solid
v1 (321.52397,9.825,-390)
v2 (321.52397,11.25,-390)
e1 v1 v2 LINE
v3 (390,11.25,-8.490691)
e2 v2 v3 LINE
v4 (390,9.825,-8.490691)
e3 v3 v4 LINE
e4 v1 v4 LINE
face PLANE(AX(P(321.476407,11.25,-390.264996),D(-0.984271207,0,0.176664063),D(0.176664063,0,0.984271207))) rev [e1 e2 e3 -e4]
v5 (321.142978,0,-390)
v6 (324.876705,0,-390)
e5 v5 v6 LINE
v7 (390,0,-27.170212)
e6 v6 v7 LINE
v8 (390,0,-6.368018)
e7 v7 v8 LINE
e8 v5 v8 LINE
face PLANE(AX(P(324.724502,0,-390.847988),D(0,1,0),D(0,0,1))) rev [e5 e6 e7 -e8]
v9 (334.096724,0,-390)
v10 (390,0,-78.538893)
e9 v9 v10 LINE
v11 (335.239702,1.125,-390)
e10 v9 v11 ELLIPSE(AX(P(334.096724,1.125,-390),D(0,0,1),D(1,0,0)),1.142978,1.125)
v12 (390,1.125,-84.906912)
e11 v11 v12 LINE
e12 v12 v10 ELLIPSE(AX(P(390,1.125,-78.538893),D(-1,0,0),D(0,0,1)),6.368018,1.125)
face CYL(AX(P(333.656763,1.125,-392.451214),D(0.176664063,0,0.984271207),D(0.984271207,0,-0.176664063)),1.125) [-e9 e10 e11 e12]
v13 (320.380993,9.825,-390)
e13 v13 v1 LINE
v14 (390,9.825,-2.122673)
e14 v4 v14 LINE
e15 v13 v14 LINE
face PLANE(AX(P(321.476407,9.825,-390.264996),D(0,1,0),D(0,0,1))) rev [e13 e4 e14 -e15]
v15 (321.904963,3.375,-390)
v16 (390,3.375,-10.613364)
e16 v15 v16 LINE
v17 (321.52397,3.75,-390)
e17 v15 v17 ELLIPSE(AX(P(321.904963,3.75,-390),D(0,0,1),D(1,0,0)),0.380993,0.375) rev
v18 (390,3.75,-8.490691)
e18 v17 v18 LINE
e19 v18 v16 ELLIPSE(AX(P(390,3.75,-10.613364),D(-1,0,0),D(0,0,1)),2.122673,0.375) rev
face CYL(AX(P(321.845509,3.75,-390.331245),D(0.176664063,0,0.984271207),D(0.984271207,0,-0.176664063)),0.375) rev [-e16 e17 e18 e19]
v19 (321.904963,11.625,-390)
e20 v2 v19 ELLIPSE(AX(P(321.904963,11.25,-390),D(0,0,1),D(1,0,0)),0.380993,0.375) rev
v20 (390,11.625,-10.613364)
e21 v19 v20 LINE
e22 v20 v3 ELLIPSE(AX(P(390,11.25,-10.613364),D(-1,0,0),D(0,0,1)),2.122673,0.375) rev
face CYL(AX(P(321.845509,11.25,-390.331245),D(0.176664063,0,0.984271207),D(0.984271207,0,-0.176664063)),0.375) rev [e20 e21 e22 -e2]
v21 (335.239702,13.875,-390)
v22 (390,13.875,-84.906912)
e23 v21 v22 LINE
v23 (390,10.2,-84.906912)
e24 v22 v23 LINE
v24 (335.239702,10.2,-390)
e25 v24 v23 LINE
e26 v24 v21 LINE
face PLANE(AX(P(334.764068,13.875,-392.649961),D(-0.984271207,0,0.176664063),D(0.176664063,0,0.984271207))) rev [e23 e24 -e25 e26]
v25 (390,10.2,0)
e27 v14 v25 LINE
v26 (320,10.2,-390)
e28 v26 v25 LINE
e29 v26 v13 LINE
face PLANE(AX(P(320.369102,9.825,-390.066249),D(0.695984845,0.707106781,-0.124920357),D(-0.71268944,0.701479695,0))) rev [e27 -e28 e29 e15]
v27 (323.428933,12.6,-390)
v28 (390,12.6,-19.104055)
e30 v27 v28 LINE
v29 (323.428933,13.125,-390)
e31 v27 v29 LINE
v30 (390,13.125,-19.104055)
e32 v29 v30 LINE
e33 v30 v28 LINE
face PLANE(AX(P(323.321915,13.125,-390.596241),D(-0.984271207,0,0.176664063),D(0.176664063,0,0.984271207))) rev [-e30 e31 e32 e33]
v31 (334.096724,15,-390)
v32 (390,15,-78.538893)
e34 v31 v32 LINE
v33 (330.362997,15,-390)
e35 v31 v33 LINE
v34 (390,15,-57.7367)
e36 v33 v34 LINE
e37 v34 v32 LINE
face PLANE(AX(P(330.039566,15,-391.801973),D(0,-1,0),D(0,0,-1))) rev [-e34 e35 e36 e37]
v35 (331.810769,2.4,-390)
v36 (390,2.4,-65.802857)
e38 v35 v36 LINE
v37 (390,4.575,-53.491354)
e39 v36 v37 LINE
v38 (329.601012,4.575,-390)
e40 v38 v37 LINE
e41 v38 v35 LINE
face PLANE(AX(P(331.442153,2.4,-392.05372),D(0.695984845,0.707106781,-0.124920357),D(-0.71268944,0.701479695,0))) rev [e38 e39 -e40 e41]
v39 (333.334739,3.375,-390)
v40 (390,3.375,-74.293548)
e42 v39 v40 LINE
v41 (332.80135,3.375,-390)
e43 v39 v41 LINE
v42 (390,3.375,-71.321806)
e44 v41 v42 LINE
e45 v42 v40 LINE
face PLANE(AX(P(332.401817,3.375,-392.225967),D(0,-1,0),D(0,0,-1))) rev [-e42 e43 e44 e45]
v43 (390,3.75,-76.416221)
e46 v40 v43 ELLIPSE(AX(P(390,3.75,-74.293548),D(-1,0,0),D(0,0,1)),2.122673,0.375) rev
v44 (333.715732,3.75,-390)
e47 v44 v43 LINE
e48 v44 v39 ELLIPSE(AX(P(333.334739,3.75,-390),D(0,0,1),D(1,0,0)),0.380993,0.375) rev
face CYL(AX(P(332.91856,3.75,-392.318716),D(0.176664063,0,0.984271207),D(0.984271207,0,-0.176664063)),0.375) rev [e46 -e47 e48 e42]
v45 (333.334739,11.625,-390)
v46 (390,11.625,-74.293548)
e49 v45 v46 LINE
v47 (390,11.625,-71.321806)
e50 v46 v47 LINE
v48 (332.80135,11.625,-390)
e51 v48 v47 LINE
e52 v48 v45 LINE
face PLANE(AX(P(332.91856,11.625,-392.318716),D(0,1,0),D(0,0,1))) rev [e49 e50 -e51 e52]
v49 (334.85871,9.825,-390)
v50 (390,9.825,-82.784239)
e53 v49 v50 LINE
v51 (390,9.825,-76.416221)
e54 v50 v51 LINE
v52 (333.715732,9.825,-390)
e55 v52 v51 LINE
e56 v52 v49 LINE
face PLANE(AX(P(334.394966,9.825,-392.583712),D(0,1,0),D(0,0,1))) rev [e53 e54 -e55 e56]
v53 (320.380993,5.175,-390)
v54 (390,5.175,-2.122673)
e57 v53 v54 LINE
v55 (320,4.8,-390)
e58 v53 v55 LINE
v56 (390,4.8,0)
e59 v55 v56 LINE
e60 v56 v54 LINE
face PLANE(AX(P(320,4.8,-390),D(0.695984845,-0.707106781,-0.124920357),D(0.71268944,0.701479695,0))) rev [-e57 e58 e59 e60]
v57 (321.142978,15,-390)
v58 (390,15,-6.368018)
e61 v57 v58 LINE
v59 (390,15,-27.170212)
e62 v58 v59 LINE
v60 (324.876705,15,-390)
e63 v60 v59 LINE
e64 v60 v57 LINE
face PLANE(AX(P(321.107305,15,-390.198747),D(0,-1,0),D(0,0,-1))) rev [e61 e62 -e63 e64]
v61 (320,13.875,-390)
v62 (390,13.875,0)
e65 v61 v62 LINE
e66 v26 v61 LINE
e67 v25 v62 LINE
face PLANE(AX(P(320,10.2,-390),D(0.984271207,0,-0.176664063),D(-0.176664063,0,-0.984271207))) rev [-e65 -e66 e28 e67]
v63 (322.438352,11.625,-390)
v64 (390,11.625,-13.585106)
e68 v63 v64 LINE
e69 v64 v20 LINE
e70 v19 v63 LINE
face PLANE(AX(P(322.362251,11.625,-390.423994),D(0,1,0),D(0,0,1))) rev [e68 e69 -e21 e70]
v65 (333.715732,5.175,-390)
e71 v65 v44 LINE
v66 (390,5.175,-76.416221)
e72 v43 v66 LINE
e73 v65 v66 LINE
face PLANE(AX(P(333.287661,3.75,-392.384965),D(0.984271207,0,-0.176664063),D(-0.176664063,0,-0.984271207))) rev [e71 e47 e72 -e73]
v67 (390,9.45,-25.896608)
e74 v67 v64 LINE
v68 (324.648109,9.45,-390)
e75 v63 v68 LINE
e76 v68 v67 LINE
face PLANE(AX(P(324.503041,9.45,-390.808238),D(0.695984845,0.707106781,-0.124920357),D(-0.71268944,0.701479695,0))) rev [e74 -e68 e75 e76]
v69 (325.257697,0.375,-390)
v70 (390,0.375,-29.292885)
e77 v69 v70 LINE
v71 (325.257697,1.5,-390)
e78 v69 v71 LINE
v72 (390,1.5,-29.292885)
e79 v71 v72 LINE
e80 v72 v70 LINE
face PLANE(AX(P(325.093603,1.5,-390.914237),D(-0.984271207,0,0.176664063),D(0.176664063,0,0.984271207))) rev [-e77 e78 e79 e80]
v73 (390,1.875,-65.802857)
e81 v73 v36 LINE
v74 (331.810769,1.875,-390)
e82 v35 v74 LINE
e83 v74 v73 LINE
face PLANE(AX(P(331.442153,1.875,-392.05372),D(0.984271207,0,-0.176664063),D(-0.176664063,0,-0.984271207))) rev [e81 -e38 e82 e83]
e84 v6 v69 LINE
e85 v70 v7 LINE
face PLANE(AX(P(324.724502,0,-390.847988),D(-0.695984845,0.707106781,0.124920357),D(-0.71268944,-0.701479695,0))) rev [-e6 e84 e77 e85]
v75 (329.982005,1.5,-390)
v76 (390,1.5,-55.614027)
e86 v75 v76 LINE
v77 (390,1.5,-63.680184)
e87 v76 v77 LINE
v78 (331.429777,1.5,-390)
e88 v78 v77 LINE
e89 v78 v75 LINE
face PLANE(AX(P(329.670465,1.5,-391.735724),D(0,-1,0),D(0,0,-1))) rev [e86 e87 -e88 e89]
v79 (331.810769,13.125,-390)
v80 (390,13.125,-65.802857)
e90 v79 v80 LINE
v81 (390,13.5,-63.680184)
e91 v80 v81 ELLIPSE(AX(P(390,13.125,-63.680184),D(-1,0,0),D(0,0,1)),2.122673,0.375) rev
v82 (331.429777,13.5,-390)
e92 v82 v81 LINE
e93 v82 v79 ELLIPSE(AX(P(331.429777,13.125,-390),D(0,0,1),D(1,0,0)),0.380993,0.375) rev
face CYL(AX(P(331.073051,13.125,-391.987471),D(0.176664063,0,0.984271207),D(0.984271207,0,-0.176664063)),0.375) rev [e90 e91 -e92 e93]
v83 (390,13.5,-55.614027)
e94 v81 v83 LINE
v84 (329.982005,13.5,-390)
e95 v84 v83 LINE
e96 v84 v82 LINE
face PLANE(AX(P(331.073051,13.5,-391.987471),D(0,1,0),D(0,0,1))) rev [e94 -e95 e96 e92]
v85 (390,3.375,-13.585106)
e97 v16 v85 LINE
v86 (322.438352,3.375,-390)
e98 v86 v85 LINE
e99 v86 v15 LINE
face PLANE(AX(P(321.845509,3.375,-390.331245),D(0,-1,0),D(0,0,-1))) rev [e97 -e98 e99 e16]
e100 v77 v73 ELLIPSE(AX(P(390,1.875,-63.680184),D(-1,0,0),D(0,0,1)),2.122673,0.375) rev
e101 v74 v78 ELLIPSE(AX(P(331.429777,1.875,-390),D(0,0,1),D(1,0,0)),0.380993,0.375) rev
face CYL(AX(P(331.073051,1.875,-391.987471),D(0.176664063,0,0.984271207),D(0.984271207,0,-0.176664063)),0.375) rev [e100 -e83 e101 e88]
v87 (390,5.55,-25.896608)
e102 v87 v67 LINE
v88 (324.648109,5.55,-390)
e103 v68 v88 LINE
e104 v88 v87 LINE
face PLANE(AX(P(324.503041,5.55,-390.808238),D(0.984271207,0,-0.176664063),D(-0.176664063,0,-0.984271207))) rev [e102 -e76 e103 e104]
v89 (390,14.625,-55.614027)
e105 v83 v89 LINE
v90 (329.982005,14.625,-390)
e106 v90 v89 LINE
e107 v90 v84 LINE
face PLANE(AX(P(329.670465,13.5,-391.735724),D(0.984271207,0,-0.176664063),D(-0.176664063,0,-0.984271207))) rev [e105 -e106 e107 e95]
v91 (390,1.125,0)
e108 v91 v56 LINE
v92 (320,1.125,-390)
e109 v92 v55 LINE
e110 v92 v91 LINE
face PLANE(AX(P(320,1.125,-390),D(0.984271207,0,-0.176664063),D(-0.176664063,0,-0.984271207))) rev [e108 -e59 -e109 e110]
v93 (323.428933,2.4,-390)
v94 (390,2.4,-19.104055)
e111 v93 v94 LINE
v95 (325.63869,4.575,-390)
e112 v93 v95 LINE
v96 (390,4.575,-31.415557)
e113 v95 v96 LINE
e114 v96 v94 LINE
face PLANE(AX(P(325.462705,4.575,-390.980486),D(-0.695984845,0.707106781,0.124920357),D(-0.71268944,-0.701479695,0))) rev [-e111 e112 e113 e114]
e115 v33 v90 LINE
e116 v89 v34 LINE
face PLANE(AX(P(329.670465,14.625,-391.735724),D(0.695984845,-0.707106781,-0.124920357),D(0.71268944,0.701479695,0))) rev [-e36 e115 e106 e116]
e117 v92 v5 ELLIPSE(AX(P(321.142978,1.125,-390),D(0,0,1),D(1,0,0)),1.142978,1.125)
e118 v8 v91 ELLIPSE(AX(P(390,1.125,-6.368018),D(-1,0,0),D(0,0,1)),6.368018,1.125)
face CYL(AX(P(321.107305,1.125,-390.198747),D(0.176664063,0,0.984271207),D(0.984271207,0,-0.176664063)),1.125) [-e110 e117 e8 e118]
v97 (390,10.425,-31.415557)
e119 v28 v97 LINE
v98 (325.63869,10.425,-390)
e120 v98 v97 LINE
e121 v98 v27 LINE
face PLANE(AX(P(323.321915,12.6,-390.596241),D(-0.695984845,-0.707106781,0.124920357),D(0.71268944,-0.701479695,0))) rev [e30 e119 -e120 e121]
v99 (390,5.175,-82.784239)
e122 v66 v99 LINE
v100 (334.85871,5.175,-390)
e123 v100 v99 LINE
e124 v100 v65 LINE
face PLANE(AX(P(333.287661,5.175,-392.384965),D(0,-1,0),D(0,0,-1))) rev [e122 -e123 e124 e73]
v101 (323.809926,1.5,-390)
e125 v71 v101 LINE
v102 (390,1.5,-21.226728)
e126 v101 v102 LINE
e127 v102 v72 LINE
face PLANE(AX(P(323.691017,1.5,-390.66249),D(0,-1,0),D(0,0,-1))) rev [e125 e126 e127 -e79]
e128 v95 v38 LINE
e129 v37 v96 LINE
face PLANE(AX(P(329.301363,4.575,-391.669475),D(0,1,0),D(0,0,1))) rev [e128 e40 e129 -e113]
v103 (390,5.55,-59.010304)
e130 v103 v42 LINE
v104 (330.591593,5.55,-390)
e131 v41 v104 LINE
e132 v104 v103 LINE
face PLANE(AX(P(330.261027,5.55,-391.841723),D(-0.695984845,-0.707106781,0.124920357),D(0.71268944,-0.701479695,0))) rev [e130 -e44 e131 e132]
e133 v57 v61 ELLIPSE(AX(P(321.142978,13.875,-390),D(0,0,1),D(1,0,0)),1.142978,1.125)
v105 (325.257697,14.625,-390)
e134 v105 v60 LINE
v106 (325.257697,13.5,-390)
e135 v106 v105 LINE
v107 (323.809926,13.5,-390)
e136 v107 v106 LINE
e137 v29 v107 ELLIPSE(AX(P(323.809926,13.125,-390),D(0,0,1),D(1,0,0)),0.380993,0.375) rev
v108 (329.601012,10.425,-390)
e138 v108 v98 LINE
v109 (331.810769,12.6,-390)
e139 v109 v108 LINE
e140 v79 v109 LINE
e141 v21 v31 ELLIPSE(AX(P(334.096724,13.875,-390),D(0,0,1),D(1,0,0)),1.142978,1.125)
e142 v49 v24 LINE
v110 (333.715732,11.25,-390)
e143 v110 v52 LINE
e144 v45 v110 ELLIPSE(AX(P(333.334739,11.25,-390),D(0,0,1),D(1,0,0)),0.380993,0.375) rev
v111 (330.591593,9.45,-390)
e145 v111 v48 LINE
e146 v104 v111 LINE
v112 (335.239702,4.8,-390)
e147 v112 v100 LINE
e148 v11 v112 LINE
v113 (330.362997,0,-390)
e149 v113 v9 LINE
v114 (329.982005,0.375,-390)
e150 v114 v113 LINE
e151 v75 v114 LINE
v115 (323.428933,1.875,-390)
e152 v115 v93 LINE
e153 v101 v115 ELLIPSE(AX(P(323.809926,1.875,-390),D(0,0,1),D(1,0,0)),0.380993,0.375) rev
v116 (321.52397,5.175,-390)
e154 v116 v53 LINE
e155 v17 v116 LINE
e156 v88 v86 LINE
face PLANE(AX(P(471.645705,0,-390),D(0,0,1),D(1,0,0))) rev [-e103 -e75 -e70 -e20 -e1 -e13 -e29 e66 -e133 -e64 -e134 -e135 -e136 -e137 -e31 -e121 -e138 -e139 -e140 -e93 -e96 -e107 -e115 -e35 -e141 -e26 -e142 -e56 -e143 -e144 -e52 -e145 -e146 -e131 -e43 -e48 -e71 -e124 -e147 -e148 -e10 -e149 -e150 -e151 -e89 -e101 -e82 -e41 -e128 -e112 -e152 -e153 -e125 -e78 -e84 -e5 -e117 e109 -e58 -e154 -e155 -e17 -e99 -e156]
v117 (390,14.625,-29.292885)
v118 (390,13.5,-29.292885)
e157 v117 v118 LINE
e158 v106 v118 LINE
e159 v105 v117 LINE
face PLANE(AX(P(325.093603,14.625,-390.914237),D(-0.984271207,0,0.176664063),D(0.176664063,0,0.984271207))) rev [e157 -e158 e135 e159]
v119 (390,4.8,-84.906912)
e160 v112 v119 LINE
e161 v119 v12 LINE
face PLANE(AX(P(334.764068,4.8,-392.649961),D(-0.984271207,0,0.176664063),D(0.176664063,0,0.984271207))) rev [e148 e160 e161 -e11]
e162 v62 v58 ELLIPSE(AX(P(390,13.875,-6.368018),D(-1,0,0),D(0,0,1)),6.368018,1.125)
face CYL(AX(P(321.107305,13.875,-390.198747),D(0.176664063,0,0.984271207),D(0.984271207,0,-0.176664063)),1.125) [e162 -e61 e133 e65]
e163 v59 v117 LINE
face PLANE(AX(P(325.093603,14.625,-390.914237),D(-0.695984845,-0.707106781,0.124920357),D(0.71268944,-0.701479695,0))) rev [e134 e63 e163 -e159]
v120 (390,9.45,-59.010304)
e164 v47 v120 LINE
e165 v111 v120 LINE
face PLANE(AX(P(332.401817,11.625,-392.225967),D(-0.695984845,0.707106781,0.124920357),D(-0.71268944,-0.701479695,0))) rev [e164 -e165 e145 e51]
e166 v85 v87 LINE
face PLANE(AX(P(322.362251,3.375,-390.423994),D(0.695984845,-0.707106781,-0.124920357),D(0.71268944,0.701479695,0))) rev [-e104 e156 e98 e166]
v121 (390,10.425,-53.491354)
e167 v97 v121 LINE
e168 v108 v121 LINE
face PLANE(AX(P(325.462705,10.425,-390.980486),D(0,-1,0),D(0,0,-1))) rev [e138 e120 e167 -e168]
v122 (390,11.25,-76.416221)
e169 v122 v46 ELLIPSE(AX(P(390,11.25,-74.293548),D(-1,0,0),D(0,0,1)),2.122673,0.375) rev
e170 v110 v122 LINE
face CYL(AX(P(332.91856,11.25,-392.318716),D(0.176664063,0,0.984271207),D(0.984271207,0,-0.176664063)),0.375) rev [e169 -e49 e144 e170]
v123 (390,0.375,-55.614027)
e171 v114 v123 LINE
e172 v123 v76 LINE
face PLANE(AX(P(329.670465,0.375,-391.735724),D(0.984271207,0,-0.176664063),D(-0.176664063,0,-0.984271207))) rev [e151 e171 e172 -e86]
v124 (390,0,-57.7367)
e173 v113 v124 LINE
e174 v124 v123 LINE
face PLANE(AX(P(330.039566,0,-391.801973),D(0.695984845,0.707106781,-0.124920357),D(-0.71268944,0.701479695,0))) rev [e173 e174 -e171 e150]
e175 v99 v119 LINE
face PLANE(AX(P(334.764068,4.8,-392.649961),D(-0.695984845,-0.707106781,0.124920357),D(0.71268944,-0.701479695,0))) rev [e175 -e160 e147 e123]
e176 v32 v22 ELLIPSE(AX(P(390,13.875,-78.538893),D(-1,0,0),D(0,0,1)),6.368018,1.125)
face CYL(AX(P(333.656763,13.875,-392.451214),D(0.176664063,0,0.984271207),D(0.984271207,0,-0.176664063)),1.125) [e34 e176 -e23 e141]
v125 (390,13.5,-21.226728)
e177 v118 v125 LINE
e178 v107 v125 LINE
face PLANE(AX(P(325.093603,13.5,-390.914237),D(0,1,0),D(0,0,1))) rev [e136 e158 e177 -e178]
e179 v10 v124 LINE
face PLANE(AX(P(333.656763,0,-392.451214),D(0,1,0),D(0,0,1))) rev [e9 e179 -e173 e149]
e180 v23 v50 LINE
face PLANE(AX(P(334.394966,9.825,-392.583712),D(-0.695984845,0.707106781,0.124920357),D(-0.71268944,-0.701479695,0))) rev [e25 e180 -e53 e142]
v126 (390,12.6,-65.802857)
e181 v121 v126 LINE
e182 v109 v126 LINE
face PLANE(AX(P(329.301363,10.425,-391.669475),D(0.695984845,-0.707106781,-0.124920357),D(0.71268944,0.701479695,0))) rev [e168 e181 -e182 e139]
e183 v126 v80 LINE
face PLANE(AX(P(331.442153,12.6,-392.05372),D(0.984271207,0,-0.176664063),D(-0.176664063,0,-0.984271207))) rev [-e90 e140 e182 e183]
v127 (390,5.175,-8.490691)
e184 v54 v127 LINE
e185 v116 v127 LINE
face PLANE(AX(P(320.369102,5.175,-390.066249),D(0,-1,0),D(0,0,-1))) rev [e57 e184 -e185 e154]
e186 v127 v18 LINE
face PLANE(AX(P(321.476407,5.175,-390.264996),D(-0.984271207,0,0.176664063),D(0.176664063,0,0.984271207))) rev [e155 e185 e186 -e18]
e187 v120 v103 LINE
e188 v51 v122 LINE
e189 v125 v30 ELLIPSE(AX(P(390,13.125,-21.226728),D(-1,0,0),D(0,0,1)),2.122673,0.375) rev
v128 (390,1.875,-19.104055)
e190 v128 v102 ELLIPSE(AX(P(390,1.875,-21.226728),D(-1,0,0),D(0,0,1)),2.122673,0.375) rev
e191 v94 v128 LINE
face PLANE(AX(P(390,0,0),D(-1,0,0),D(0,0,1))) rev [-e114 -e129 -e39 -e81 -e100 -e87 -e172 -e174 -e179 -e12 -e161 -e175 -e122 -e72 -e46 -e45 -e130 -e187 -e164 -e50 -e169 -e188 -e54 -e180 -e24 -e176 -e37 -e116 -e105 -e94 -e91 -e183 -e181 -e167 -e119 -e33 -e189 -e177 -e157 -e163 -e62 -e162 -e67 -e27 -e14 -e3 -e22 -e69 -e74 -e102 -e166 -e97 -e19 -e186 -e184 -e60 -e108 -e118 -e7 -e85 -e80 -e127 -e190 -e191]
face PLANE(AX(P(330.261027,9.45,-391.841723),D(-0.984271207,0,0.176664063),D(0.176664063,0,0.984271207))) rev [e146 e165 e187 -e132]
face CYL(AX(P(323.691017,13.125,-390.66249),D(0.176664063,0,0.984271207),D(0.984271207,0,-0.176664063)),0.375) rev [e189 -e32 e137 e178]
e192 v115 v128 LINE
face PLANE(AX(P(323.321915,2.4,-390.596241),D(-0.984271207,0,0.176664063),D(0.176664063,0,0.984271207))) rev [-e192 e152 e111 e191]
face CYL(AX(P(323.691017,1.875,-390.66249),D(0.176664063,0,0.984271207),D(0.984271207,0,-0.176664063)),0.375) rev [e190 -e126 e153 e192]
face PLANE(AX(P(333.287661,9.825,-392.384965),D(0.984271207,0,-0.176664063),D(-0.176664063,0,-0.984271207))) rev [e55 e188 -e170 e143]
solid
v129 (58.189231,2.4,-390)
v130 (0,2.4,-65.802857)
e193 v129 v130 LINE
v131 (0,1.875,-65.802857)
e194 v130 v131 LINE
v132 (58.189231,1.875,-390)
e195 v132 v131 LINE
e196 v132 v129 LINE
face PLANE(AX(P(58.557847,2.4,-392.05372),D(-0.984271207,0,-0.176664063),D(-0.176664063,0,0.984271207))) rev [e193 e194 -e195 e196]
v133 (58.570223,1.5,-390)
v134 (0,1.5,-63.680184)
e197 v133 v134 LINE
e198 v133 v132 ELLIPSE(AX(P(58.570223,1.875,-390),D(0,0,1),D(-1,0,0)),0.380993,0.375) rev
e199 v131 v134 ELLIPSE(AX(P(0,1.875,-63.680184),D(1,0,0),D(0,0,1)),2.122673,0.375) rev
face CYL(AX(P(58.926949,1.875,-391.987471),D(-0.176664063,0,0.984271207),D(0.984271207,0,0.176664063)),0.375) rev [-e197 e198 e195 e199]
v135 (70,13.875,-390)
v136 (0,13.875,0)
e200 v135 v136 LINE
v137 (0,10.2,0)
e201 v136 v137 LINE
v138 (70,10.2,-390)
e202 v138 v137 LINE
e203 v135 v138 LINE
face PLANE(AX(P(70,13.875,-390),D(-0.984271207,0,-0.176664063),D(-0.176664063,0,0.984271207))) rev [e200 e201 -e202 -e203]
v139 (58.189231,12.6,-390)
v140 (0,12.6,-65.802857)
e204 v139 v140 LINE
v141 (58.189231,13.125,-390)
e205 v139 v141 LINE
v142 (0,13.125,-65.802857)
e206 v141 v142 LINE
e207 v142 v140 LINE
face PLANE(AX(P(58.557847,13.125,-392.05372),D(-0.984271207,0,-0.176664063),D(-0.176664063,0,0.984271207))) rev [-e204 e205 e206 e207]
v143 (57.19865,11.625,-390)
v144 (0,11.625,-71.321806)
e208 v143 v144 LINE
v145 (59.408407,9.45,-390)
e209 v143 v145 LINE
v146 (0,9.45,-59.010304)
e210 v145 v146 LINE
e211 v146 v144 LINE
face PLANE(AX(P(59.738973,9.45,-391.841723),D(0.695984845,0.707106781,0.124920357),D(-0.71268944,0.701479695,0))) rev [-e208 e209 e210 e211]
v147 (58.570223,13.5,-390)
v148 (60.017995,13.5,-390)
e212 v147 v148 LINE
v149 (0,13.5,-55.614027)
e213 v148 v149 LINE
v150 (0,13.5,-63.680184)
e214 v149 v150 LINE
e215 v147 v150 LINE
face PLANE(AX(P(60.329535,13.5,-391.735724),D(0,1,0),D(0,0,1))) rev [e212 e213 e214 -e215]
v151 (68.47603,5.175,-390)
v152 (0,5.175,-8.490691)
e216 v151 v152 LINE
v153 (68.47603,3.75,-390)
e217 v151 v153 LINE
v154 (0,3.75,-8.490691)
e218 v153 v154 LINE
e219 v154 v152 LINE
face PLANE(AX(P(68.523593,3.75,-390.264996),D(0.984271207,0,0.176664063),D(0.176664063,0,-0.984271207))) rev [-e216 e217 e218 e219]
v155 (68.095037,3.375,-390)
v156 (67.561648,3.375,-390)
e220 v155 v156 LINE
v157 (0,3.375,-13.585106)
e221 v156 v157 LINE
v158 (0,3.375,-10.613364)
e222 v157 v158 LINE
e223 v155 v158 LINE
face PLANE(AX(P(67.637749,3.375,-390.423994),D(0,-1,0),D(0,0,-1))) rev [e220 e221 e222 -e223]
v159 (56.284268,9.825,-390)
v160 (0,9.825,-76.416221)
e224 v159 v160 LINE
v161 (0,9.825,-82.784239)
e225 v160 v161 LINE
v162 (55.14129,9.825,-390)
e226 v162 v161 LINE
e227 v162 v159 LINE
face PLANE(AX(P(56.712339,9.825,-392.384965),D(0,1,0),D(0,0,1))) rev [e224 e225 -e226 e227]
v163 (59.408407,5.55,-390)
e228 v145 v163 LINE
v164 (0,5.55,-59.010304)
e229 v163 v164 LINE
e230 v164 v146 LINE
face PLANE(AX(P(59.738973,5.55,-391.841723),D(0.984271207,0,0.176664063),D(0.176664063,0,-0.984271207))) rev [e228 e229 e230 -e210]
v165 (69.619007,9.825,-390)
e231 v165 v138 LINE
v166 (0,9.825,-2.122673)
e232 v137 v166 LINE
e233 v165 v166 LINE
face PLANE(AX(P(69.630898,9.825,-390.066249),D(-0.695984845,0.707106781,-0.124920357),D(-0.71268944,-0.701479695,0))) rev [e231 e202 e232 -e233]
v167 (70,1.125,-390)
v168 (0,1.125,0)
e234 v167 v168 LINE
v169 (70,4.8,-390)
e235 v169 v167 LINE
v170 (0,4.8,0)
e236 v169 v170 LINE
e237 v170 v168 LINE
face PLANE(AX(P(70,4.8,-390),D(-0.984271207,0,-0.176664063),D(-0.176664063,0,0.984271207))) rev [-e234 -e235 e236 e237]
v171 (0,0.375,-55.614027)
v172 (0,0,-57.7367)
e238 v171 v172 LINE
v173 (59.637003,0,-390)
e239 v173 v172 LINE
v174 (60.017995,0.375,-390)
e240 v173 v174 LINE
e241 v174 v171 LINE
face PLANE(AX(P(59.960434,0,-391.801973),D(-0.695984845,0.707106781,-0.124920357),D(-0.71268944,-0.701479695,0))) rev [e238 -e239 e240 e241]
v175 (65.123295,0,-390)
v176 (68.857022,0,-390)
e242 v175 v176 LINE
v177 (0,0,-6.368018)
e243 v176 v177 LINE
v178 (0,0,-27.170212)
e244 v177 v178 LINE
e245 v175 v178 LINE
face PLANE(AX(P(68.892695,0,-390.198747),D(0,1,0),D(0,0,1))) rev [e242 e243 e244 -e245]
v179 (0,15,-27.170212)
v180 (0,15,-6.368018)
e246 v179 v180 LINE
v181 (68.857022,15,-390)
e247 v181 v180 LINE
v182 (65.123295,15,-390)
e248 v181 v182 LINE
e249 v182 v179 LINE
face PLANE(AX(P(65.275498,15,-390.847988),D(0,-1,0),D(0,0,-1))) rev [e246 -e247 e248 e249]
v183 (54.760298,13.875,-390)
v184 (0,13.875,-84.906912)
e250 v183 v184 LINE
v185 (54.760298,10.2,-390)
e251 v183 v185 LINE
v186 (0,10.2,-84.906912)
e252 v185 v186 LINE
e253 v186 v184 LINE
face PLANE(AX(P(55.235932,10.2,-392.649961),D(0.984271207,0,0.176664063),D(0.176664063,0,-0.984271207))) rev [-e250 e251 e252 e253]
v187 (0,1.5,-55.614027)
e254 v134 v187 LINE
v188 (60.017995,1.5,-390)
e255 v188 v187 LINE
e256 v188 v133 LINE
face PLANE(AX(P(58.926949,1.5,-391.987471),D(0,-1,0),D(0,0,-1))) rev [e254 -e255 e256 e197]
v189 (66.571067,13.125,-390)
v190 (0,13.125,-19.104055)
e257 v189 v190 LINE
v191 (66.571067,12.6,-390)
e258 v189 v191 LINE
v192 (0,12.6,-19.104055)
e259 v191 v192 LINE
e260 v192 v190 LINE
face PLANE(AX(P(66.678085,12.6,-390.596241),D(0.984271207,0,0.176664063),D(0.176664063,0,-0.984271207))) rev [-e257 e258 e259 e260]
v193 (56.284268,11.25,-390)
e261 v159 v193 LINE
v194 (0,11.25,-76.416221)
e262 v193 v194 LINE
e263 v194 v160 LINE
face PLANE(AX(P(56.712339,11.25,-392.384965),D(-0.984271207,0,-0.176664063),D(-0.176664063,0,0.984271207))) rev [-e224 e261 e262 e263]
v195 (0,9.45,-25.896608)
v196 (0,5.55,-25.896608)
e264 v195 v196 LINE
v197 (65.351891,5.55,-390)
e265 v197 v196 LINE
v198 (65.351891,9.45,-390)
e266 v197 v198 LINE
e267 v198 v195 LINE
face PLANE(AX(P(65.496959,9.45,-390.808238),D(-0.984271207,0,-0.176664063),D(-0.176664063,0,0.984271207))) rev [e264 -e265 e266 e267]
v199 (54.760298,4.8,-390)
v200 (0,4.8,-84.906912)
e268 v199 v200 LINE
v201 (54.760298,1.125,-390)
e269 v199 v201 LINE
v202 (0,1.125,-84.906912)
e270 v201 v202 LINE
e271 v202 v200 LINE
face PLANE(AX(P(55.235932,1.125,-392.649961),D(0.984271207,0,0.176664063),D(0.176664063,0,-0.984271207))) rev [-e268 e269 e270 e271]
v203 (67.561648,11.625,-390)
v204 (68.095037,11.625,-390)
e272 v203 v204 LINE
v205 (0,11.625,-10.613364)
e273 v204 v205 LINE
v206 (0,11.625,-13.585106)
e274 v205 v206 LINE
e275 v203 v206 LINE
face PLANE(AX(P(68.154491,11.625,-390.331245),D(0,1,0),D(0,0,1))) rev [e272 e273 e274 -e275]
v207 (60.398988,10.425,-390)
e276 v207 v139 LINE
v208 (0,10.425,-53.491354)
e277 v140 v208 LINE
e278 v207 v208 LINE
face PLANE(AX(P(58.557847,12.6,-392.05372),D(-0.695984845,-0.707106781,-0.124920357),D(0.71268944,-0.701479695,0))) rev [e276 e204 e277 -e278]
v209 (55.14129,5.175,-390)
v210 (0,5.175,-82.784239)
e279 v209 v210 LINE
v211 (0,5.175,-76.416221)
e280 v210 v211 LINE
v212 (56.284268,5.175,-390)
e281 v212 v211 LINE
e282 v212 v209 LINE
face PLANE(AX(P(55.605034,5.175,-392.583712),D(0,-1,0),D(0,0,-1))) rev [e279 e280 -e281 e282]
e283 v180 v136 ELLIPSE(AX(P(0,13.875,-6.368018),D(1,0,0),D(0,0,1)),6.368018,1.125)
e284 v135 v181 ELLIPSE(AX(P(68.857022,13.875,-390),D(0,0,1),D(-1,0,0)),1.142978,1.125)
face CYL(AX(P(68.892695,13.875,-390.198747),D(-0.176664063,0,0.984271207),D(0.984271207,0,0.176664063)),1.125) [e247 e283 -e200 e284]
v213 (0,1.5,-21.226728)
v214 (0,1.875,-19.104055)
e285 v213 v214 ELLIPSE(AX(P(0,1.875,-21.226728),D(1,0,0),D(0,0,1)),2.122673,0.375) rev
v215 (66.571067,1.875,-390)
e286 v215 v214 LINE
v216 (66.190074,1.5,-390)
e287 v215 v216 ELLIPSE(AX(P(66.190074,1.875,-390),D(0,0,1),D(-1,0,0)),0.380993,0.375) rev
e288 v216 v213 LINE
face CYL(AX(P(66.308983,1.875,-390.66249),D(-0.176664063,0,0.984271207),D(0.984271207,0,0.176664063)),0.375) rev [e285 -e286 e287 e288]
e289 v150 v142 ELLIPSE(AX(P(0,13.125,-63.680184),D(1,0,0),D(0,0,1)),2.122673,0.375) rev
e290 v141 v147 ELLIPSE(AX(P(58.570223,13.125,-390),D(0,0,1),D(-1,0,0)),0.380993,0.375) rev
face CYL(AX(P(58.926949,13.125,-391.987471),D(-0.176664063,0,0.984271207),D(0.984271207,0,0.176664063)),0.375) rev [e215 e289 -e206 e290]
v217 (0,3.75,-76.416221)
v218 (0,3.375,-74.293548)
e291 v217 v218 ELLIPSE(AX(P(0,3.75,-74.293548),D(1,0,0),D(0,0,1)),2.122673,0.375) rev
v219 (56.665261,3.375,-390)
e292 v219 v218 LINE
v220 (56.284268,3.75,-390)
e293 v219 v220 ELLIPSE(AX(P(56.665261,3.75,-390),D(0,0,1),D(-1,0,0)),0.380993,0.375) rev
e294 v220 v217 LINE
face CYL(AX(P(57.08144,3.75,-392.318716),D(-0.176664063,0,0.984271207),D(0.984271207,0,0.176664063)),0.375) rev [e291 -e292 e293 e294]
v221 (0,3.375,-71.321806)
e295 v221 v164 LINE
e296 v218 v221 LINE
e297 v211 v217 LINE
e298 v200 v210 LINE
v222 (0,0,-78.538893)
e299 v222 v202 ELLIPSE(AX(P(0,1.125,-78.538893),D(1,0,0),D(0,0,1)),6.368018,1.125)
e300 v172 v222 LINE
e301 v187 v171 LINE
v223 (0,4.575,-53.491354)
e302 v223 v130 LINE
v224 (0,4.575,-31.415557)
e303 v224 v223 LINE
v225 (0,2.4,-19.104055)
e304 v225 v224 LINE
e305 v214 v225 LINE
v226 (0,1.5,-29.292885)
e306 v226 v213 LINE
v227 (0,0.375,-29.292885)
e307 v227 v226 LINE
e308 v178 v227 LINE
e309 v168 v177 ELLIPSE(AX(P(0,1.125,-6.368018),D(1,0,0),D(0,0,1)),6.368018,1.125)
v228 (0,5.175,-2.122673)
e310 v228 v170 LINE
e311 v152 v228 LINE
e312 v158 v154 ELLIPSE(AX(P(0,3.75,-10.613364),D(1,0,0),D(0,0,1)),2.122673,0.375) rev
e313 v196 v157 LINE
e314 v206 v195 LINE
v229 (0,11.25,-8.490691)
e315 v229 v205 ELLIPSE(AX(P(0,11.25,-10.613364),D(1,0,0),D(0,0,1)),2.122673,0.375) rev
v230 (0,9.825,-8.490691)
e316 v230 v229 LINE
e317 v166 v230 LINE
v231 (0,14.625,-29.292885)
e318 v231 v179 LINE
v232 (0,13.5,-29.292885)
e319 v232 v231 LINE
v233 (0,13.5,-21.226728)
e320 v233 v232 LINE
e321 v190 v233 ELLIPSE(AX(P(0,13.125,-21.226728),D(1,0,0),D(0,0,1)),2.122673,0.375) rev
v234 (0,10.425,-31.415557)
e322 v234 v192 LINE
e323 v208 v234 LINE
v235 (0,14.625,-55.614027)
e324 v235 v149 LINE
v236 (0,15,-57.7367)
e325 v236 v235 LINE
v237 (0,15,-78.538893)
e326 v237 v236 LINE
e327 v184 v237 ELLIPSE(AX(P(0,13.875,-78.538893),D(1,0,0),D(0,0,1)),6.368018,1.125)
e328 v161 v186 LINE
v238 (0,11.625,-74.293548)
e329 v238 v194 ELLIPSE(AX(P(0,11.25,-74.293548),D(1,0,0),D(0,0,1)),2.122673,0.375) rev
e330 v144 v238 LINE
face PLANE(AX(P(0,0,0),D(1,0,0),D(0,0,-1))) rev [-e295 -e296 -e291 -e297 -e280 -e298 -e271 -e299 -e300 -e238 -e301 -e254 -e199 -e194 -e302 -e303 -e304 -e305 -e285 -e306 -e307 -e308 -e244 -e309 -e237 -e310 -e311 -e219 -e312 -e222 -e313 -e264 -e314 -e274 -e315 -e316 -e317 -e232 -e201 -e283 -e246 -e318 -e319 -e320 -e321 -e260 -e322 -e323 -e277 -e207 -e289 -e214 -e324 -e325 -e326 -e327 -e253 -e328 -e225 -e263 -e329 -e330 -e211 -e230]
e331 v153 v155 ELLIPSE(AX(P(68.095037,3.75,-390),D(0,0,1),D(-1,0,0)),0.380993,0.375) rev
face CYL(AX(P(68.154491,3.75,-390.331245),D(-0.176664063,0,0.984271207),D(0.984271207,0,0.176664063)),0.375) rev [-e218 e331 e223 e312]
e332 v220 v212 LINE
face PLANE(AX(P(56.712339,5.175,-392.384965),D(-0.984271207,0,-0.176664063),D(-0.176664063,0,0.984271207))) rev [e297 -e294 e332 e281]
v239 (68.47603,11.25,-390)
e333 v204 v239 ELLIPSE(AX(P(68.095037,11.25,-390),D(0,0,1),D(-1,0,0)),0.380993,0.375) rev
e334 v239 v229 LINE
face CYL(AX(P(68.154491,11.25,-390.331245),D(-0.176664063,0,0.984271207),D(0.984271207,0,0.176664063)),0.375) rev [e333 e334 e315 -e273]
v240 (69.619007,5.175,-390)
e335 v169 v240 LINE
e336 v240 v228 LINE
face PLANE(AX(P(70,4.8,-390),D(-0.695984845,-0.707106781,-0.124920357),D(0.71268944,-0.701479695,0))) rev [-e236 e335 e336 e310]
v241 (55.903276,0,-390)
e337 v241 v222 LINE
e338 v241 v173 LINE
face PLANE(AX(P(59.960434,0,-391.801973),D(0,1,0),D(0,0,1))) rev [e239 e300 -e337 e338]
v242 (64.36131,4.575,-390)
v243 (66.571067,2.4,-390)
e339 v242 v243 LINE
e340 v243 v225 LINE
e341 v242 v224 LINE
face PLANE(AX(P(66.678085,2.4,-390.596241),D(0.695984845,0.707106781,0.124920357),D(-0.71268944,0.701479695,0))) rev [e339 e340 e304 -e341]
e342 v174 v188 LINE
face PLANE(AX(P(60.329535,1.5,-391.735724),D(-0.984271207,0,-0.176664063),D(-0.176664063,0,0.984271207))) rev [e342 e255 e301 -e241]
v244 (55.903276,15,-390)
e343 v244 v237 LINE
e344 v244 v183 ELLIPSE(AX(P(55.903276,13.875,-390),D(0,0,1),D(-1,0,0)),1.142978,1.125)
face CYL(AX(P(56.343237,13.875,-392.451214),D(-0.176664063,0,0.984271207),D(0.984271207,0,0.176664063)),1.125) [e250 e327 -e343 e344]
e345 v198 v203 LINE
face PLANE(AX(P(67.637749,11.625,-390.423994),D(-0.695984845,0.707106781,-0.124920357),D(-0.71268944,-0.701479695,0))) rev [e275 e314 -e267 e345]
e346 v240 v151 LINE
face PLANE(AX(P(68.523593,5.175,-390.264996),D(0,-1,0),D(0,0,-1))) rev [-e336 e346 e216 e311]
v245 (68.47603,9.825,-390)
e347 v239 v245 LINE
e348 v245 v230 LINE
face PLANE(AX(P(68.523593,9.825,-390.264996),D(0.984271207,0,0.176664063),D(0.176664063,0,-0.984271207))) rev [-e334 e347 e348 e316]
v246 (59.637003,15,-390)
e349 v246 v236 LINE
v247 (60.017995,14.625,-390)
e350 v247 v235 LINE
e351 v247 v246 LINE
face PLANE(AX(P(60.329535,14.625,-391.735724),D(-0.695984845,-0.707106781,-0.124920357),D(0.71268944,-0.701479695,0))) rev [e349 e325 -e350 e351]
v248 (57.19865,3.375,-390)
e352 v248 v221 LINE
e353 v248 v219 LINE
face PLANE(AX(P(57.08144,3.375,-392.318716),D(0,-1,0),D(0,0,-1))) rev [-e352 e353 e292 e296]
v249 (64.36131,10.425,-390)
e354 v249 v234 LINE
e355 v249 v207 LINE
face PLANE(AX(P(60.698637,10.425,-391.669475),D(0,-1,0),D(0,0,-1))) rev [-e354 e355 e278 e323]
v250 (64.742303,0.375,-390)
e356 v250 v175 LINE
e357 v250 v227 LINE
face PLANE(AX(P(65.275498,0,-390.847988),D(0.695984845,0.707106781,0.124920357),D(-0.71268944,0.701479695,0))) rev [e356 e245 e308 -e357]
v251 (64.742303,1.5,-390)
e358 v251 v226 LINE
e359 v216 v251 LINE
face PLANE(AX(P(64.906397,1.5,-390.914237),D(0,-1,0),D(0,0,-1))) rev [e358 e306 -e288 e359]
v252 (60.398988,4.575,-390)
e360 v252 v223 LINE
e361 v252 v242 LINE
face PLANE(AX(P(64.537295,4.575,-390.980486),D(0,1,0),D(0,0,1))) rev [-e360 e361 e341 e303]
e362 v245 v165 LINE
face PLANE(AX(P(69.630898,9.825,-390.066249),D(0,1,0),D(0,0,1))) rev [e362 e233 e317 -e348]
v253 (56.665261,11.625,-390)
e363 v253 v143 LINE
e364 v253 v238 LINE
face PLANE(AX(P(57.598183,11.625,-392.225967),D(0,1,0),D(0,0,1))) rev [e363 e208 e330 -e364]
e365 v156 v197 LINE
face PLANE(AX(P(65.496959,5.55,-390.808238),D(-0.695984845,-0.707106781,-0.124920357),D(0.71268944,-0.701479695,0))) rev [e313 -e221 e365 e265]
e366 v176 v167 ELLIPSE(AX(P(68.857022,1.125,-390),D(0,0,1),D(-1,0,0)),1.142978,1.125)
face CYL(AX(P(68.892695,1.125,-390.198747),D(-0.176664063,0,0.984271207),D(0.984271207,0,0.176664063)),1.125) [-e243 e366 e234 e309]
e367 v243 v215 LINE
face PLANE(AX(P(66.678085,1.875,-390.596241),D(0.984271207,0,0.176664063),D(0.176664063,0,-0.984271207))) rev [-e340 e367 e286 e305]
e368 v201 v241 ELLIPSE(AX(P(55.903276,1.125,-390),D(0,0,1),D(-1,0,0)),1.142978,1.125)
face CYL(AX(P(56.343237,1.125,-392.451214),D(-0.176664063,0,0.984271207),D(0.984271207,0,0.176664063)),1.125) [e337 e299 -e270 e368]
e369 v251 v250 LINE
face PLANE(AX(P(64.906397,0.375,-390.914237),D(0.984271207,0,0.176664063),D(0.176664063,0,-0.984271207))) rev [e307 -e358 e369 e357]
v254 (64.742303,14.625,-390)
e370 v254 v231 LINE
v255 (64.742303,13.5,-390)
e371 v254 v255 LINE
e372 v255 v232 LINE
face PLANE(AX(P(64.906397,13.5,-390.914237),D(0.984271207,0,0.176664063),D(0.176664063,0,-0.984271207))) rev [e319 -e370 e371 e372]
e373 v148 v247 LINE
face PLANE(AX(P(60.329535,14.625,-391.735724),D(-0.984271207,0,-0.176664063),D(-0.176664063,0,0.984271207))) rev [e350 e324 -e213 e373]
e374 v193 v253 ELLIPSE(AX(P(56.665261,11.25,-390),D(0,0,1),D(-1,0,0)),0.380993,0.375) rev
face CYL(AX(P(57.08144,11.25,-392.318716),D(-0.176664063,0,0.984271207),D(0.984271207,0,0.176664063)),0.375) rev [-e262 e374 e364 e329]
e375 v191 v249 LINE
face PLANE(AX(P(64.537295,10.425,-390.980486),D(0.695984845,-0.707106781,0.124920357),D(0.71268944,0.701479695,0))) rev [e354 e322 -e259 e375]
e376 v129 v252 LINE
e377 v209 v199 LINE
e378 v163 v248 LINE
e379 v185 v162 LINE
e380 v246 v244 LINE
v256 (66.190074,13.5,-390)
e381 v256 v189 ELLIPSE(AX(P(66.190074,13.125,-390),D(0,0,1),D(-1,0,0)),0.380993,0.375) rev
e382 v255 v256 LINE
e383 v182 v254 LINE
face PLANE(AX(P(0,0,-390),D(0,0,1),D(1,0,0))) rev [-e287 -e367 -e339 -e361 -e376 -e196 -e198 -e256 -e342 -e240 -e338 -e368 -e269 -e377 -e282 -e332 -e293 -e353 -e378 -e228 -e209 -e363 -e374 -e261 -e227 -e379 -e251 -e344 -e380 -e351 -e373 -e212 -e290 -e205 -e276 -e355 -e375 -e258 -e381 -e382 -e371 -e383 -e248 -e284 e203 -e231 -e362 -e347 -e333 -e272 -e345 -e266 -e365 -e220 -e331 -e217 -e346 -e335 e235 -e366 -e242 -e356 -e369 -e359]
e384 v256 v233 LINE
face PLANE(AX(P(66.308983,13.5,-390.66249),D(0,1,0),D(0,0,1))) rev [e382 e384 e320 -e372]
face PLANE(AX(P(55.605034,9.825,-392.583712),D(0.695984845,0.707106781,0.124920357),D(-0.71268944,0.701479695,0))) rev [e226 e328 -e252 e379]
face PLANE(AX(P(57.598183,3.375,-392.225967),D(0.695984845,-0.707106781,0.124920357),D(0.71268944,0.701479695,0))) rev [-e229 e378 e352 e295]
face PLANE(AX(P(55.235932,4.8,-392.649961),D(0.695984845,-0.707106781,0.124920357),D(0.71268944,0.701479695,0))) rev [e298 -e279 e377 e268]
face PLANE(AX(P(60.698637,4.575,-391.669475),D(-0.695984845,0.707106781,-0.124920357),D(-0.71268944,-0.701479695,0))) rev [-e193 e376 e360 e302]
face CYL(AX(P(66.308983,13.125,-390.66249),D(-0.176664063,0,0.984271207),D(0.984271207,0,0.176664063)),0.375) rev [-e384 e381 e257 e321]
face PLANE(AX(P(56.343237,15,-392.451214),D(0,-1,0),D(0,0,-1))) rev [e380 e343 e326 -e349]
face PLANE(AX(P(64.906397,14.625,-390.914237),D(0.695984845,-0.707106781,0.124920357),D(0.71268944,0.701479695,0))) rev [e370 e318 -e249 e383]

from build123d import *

# Parameters (mm, degrees)
ALUMINUM_START                        = -327.333270634
ALUMINUM_PROFILES_VRC_15X15_2_DEPTH   = 396.232255124
ALUMINUM_PROFILES_VRC_15X15_2_2_DEPTH = 396.232255123
CUT_EXTRUDE2_DEPTH                    = 565.121390002
CUT_EXTRUDE2_DEPTH_BACK               = 565.121390002
SKETCH5_W                             = 23.238168361
SKETCH5_H                             = 113.39268938
SKETCH5_W_2                           = 161.911998808
SKETCH5_H_2                           = 133.487324877
SKETCH5_W_3                           = 195.704106921
SKETCH5_H_3                           = 154.963599137
SKETCH5_W_4                           = 70


# Read off the part's stored shape, not the designer's step: Aluminum profiles VRC_15X15(2)
with BuildPart() as part:
    # Aluminum profiles VRC_15X15(2) outline → Aluminum profiles VRC_15X15(2) (new body)
    with BuildSketch(Plane(origin=(0, 0, 0), x_dir=(0.984271206993884, 0, -0.17666406279377403), z_dir=(0.17666406279377403, 0, 0.9842712069938842)).offset(ALUMINUM_START)):
        with BuildLine():
            Line((389.415770728, 4.575), (393.315770728, 4.575))
            Line((393.315770728, 4.575), (395.490770728, 2.4))
            Line((395.490770728, 2.4), (395.490770728, 1.875))
            ThreePointArc((395.490770728, 1.875), (395.380935771, 1.609834957), (395.115770728, 1.5))
            Line((395.115770728, 1.5), (393.690770728, 1.5))
            Line((393.690770728, 1.5), (393.690770728, 0.375))
            Line((393.690770728, 0.375), (394.065770728, 0))
            Line((394.065770728, 0), (397.740770728, 0))
            ThreePointArc((397.740770728, 0), (398.536265856, 0.329504871), (398.865770728, 1.125))
            Line((398.865770728, 1.125), (398.865770728, 4.8))
            Line((398.865770728, 4.8), (398.490770728, 5.175))
            Line((398.490770728, 5.175), (397.365770728, 5.175))
            Line((397.365770728, 5.175), (397.365770728, 3.75))
            ThreePointArc((397.365770728, 3.75), (397.255935771, 3.484834957), (396.990770728, 3.375))
            Line((396.990770728, 3.375), (396.465770728, 3.375))
            Line((396.465770728, 3.375), (394.290770728, 5.55))
            Line((394.290770728, 5.55), (394.290770728, 9.45))
            Line((394.290770728, 9.45), (396.465770728, 11.625))
            Line((396.465770728, 11.625), (396.990770728, 11.625))
            ThreePointArc((396.990770728, 11.625), (397.255935771, 11.515165043), (397.365770728, 11.25))
            Line((397.365770728, 11.25), (397.365770728, 9.825))
            Line((397.365770728, 9.825), (398.490770728, 9.825))
            Line((398.490770728, 9.825), (398.865770728, 10.2))
            Line((398.865770728, 10.2), (398.865770728, 13.875))
            ThreePointArc((398.865770728, 13.875), (398.536265856, 14.670495129), (397.740770728, 15))
            Line((397.740770728, 15), (394.065770728, 15))
            Line((394.065770728, 15), (393.690770728, 14.625))
            Line((393.690770728, 14.625), (393.690770728, 13.5))
            Line((393.690770728, 13.5), (395.115770728, 13.5))
            ThreePointArc((395.115770728, 13.5), (395.380935771, 13.390165043), (395.490770728, 13.125))
            Line((395.490770728, 13.125), (395.490770728, 12.6))
            Line((395.490770728, 12.6), (393.315770728, 10.425))
            Line((393.315770728, 10.425), (389.415770728, 10.425))
            Line((389.415770728, 10.425), (387.240770728, 12.6))
            Line((387.240770728, 12.6), (387.240770728, 13.125))
            ThreePointArc((387.240770728, 13.125), (387.350605685, 13.390165043), (387.615770728, 13.5))
            Line((387.615770728, 13.5), (389.040770728, 13.5))
            Line((389.040770728, 13.5), (389.040770728, 14.625))
            Line((389.040770728, 14.625), (388.665770728, 15))
            Line((388.665770728, 15), (384.990770728, 15))
            ThreePointArc((384.990770728, 15), (384.195275599, 14.670495129), (383.865770728, 13.875))
            Line((383.865770728, 13.875), (383.865770728, 10.2))
            Line((383.865770728, 10.2), (384.240770728, 9.825))
            Line((384.240770728, 9.825), (385.365770728, 9.825))
            Line((385.365770728, 9.825), (385.365770728, 11.25))
            ThreePointArc((385.365770728, 11.25), (385.475605685, 11.515165043), (385.740770728, 11.625))
            Line((385.740770728, 11.625), (386.265770728, 11.625))
            Line((386.265770728, 11.625), (388.440770728, 9.45))
            Line((388.440770728, 9.45), (388.440770728, 5.55))
            Line((388.440770728, 5.55), (386.265770728, 3.375))
            Line((386.265770728, 3.375), (385.740770728, 3.375))
            ThreePointArc((385.740770728, 3.375), (385.475605685, 3.484834957), (385.365770728, 3.75))
            Line((385.365770728, 3.75), (385.365770728, 5.175))
            Line((385.365770728, 5.175), (384.240770728, 5.175))
            Line((384.240770728, 5.175), (383.865770728, 4.8))
            Line((383.865770728, 4.8), (383.865770728, 1.125))
            ThreePointArc((383.865770728, 1.125), (384.195275599, 0.329504871), (384.990770728, 0))
            Line((384.990770728, 0), (388.665770728, 0))
            Line((388.665770728, 0), (389.040770728, 0.375))
            Line((389.040770728, 0.375), (389.040770728, 1.5))
            Line((389.040770728, 1.5), (387.615770728, 1.5))
            ThreePointArc((387.615770728, 1.5), (387.350605685, 1.609834957), (387.240770728, 1.875))
            Line((387.240770728, 1.875), (387.240770728, 2.4))
            Line((387.240770728, 2.4), (389.415770728, 4.575))
        make_face()
    extrude(amount=ALUMINUM_PROFILES_VRC_15X15_2_DEPTH)


with BuildPart() as body_2:
    # Aluminum profiles VRC_15X15_2 2 outline → Aluminum profiles VRC_15X15_2 2 (new body)
    with BuildSketch(Plane(origin=(0, 0, 0), x_dir=(0.984271206993884, 0, 0.17666406279377403), z_dir=(0.17666406279377403, 0, -0.9842712069938842))):
        with BuildLine():
            Line((-5.55, -4.575), (-9.45, -4.575))
            Line((-9.45, -4.575), (-11.625, -2.4))
            Line((-11.625, -2.4), (-11.625, -1.875))
            ThreePointArc((-11.625, -1.875), (-11.515165043, -1.609834957), (-11.25, -1.5))
            Line((-11.25, -1.5), (-9.825, -1.5))
            Line((-9.825, -1.5), (-9.825, -0.375))
            Line((-9.825, -0.375), (-10.2, 0))
            Line((-10.2, 0), (-13.875, 0))
            ThreePointArc((-13.875, 0), (-14.670495129, -0.329504871), (-15, -1.125))
            Line((-15, -1.125), (-15, -4.8))
            Line((-15, -4.8), (-14.625, -5.175))
            Line((-14.625, -5.175), (-13.5, -5.175))
            Line((-13.5, -5.175), (-13.5, -3.75))
            ThreePointArc((-13.5, -3.75), (-13.390165043, -3.484834957), (-13.125, -3.375))
            Line((-13.125, -3.375), (-12.6, -3.375))
            Line((-12.6, -3.375), (-10.425, -5.55))
            Line((-10.425, -5.55), (-10.425, -9.45))
            Line((-10.425, -9.45), (-12.6, -11.625))
            Line((-12.6, -11.625), (-13.125, -11.625))
            ThreePointArc((-13.125, -11.625), (-13.390165043, -11.515165043), (-13.5, -11.25))
            Line((-13.5, -11.25), (-13.5, -9.825))
            Line((-13.5, -9.825), (-14.625, -9.825))
            Line((-14.625, -9.825), (-15, -10.2))
            Line((-15, -10.2), (-15, -13.875))
            ThreePointArc((-15, -13.875), (-14.670495129, -14.670495129), (-13.875, -15))
            Line((-13.875, -15), (-10.2, -15))
            Line((-10.2, -15), (-9.825, -14.625))
            Line((-9.825, -14.625), (-9.825, -13.5))
            Line((-9.825, -13.5), (-11.25, -13.5))
            ThreePointArc((-11.25, -13.5), (-11.515165043, -13.390165043), (-11.625, -13.125))
            Line((-11.625, -13.125), (-11.625, -12.6))
            Line((-11.625, -12.6), (-9.45, -10.425))
            Line((-9.45, -10.425), (-5.55, -10.425))
            Line((-5.55, -10.425), (-3.375, -12.6))
            Line((-3.375, -12.6), (-3.375, -13.125))
            ThreePointArc((-3.375, -13.125), (-3.484834957, -13.390165043), (-3.75, -13.5))
            Line((-3.75, -13.5), (-5.175, -13.5))
            Line((-5.175, -13.5), (-5.175, -14.625))
            Line((-5.175, -14.625), (-4.8, -15))
            Line((-4.8, -15), (-1.125, -15))
            ThreePointArc((-1.125, -15), (-0.329504871, -14.670495129), (0, -13.875))
            Line((0, -13.875), (0, -10.2))
            Line((0, -10.2), (-0.375, -9.825))
            Line((-0.375, -9.825), (-1.5, -9.825))
            Line((-1.5, -9.825), (-1.5, -11.25))
            ThreePointArc((-1.5, -11.25), (-1.609834957, -11.515165043), (-1.875, -11.625))
            Line((-1.875, -11.625), (-2.4, -11.625))
            Line((-2.4, -11.625), (-4.575, -9.45))
            Line((-4.575, -9.45), (-4.575, -5.55))
            Line((-4.575, -5.55), (-2.4, -3.375))
            Line((-2.4, -3.375), (-1.875, -3.375))
            ThreePointArc((-1.875, -3.375), (-1.609834957, -3.484834957), (-1.5, -3.75))
            Line((-1.5, -3.75), (-1.5, -5.175))
            Line((-1.5, -5.175), (-0.375, -5.175))
            Line((-0.375, -5.175), (0, -4.8))
            Line((0, -4.8), (0, -1.125))
            ThreePointArc((0, -1.125), (-0.329504871, -0.329504871), (-1.125, 0))
            Line((-1.125, 0), (-4.8, 0))
            Line((-4.8, 0), (-5.175, -0.375))
            Line((-5.175, -0.375), (-5.175, -1.5))
            Line((-5.175, -1.5), (-3.75, -1.5))
            ThreePointArc((-3.75, -1.5), (-3.484834957, -1.609834957), (-3.375, -1.875))
            Line((-3.375, -1.875), (-3.375, -2.4))
            Line((-3.375, -2.4), (-5.55, -4.575))
        make_face()
    extrude(amount=ALUMINUM_PROFILES_VRC_15X15_2_2_DEPTH)


with BuildPart() as cut_extrude2_tool:
    # Sketch5 → Cut-Extrude2 (new, two sides: drawn at the far end of the back side and taken through both)
    with BuildSketch(Plane(origin=(0, 15, 0), x_dir=(1, 0, 0), z_dir=(0, 1, 0)).offset(-CUT_EXTRUDE2_DEPTH_BACK)):
        with Locations((-11.619084181, 56.69634469)):
            Rectangle(SKETCH5_W, SKETCH5_H)
        with Locations((470.955999404, 66.743662439)):
            Rectangle(SKETCH5_W_2, SKETCH5_H_2)
        with Locations((373.793651941, 467.481799569)):
            Rectangle(SKETCH5_W_3, SKETCH5_H_3)
        with Locations((35, 467.481799569)):
            Rectangle(SKETCH5_W_4, SKETCH5_H_3)
    extrude(amount=CUT_EXTRUDE2_DEPTH + CUT_EXTRUDE2_DEPTH_BACK)


with BuildPart() as part_1:
    add(part.part)

    # Cut-Extrude2: cut by cut_extrude2_tool
    add(cut_extrude2_tool.part, mode=Mode.SUBTRACT)


with BuildPart() as body_2_1:
    add(body_2.part)

    # Cut-Extrude2: cut by cut_extrude2_tool
    add(cut_extrude2_tool.part, mode=Mode.SUBTRACT)


solid = Compound([part_1.part, body_2_1.part])
